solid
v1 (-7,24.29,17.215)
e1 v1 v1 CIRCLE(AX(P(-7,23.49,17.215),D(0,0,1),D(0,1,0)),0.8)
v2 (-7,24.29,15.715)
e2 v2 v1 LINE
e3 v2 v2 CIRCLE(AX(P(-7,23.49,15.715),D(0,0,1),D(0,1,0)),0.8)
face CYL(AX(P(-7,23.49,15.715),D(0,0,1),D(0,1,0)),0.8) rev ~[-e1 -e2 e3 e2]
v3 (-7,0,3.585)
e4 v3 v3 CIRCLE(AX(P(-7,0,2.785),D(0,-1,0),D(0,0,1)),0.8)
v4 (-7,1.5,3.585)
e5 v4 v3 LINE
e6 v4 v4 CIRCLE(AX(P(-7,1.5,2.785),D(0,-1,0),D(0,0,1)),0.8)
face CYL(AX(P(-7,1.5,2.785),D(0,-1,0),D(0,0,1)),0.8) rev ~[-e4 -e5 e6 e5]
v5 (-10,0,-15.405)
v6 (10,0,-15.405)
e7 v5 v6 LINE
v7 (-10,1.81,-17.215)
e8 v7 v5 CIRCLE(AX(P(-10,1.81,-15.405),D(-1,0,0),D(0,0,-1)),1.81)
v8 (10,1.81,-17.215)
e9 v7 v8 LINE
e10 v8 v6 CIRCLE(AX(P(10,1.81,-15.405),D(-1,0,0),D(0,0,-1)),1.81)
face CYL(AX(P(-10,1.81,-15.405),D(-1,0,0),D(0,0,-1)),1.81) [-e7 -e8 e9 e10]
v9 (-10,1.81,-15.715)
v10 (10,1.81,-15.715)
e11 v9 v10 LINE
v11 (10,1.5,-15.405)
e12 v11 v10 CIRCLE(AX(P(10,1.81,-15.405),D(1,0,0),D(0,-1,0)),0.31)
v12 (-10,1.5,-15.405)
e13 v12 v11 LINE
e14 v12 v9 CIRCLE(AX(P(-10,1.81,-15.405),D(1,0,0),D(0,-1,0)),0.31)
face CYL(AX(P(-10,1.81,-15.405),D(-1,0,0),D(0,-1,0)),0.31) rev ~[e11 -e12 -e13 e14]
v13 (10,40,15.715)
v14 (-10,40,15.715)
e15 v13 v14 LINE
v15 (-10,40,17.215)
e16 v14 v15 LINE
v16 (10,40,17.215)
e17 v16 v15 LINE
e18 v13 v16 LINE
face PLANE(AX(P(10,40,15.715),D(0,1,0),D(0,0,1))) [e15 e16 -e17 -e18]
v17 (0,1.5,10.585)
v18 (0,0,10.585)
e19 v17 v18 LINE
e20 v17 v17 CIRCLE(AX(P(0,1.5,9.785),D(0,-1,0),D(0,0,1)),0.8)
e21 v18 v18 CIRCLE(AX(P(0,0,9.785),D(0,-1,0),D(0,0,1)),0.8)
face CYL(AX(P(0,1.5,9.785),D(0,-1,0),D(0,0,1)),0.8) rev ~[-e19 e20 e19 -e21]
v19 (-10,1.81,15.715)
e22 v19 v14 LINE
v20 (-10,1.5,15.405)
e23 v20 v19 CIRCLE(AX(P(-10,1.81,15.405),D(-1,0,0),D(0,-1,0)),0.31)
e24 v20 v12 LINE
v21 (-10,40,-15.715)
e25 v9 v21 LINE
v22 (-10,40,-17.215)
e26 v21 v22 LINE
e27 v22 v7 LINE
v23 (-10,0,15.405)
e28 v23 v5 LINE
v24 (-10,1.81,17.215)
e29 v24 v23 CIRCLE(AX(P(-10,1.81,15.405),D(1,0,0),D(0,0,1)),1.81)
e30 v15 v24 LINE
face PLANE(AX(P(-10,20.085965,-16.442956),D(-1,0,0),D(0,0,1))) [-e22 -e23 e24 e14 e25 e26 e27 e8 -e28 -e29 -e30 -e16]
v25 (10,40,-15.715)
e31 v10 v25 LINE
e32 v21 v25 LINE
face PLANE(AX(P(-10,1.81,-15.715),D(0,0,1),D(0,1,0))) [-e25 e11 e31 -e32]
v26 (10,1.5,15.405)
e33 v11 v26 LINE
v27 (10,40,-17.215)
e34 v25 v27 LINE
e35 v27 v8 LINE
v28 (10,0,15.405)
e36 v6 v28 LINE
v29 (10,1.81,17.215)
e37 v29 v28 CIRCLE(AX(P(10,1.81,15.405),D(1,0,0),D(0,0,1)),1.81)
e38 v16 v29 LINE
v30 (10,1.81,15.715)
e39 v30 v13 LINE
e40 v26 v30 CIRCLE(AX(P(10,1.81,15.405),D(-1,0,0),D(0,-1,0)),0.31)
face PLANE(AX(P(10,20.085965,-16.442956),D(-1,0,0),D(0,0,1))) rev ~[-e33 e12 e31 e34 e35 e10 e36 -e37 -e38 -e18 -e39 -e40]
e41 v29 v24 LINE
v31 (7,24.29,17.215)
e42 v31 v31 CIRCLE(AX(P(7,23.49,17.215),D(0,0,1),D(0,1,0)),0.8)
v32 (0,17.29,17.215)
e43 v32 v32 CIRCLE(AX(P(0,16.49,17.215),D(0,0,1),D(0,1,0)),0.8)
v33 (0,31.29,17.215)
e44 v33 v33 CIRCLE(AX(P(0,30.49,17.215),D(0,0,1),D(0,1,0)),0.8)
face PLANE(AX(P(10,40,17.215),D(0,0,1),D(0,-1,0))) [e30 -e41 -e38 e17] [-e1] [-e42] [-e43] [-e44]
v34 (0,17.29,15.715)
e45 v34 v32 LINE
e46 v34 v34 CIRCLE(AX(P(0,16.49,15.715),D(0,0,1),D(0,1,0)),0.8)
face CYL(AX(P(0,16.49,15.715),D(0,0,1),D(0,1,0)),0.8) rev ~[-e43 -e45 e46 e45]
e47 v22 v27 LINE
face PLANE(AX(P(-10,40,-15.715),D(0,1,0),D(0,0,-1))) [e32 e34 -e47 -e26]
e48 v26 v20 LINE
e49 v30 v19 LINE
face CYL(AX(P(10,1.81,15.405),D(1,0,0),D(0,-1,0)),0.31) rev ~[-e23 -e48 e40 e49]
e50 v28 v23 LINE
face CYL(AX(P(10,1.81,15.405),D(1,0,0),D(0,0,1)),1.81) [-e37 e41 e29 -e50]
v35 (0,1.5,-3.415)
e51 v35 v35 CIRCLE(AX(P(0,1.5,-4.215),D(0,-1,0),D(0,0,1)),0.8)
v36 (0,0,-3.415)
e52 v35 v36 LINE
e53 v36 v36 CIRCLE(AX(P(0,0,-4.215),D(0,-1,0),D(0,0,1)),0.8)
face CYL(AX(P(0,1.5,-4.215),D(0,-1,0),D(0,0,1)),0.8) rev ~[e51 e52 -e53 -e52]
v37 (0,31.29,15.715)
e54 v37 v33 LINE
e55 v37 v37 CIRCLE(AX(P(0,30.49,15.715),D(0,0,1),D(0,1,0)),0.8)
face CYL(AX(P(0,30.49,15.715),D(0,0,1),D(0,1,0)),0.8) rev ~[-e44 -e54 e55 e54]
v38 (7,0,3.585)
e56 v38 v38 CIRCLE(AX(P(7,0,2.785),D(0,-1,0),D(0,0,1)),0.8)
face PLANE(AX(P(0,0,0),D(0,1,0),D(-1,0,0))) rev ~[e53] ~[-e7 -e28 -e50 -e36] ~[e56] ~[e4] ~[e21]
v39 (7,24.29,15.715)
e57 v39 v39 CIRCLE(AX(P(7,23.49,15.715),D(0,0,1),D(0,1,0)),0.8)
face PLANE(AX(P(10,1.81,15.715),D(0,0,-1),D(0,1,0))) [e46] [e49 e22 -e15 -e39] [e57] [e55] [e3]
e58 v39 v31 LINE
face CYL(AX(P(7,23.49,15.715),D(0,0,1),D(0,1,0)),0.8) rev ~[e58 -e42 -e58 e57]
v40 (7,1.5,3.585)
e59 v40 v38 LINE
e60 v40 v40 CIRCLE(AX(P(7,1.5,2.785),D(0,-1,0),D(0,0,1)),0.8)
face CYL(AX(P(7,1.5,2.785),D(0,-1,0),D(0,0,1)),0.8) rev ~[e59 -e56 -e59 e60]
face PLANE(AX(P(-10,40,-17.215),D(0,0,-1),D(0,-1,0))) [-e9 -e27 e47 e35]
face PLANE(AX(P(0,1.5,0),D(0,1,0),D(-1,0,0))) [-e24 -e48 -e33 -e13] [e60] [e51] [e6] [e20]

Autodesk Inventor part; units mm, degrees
ref_plane "YZ Plane" through (0, 0, 0) normal (1, 0, 0) x (0, 1, 0)
ref_plane "XZ Plane" through (0, 0, 0) normal (0, 1, 0) x (-1, 0, 0)
ref_plane "XY Plane" through (0, 0, 0) normal (0, 0, 1) x (1, 0, 0)
sketch "Sketch1" plane through (0, 0, 0) normal (0, 1, 0) x (-1, 0, 0)
  line L0 (10, -15.715) -> (-10, -15.715)
  line L1 (-10, -15.715) -> (-10, 15.715)
  line L2 (-10, 15.715) -> (10, 15.715)
  line L3 (10, 15.715) -> (10, -15.715)
  point P0 (0, 0)
  dimension "d0" = 20
  dimension "d1" = 31.43
  dimension "d2" = 10
  dimension "d3" = 15.715
extrude "Plate1" add sketch "Sketch1" along normal blind 1.5
sketch "Sketch2" plane through (10, 0, 17.215) normal (0, 0, -1) x (-1, 0, 0)
  line L0 (20, 0) -> (0, 0)
  line L1 (0, 0) -> (0, 40)
  line L2 (0, 40) -> (20, 40)
  line L3 (20, 40) -> (20, 0)
edge flange "Flange1" height 40 angle 90 thickness 1.5 bend radius 0.31 thickness toward (0, 0, -1) relief tear relief width 1.5 relief depth 0.75 edges at (0, 1.5, 15.715) wall of the first edge with corners at (-10, 0, 17.215) (10, 0, 17.215) (10, 40, 17.215) (-10, 40, 17.215)
bend "Bend1"
corner "Corner1"
sketch "Sketch3" plane through (-10, 0, -17.215) normal (0, 0, 1) x (1, 0, 0)
  line L0 (20, 0) -> (0, 0)
  line L1 (0, 0) -> (0, 40)
  line L2 (0, 40) -> (20, 40)
  line L3 (20, 40) -> (20, 0)
edge flange "Flange2" height 40 angle 90 thickness 1.5 bend radius 0.31 thickness toward (0, 0, 1) relief tear relief width 1.5 relief depth 0.75 edges at (0, 1.5, -15.715) wall of the first edge with corners at (10, 0, -17.215) (-10, 0, -17.215) (-10, 40, -17.215) (10, 40, -17.215)
bend "Bend2"
corner "Corner2"
sketch "Sketch4" plane through (10, 40, 15.715) normal (0, 0, -1) x (-1, 0, 0)
  line L0 (30.46, -23.2265) -> (30.46, -24.7935) projected
  line L1 (38.57, -15.71) -> (38.57, -17.31) projected
  circle A0 centre (3, -16.51) radius 0.7835 projected
  circle A1 centre (10, -9.51) radius 0.7835 projected
  line L2 (38.57, -15.71) -> (38.57, -17.31) projected
  line L3 (38.57, -15.71) -> (38.57, -17.31) projected
  line L4 (37.07, -17.31) -> (37.07, -15.71) projected
  line L5 (30.46, -23.2265) -> (30.46, -24.7935) projected
  circle A2 centre (10, -23.51) radius 0.7835 projected
  circle A3 centre (3, -16.51) radius 0.7835 projected
  circle A4 centre (17, -16.51) radius 0.7835 projected
  circle A5 centre (10, -9.51) radius 0.7835 projected
  point P0 (10, -40)
hole "Hole1" at (0, 16.49, 15.715) at (-7, 23.49, 15.715) at (0, 30.49, 15.715) at (7, 23.49, 15.715) direction (0, 0, 1) diameter 1.6 depth 1.5
sketch "Sketch5" plane through (0, 1.5, 0) normal (0, 1, 0) x (1, 0, 0)
  circle A0 centre (-7, -2.785) radius 0.7835 projected
  circle A1 centre (0, -9.785) radius 0.7835 projected
  circle A2 centre (7, -2.785) radius 0.7835 projected
  circle A3 centre (0, 4.215) radius 0.7835 projected
  point P0 (0, 0)
hole "Hole2" at (-7, 1.5, 2.785) at (0, 1.5, 9.785) at (7, 1.5, 2.785) at (0, 1.5, -4.215) direction (0, -1, 0) diameter 1.6 depth 1.5
equation "\"d30\" = Thickness"
equation "\"d37\" = Thickness"
equation "\"d4\" = Thickness"
equation "\"d5\" = BendReliefWidth"
equation "\"d6\" = BendReliefDepth"
equation "\"d7\" = MinimumRemnant"
equation "\"d8\" = TransitionRadius"
equation "\"d11\" = BendRadius"
equation "\"d12\" = CornerReliefSize"
equation "\"d13\" = GapSize"
equation "\"d14\" = JacobiRadiusSize"
equation "\"d15\" = BendReliefWidth"
equation "\"d16\" = BendReliefDepth"
equation "\"d17\" = MinimumRemnant"
equation "\"d18\" = TransitionRadius"
equation "\"d21\" = BendRadius"
equation "\"d22\" = CornerReliefSize"
equation "\"d23\" = GapSize"
equation "\"d24\" = JacobiRadiusSize"
equation "\"BendReliefWidth\" = Thickness"
equation "\"BendReliefDepth\" = 0.5 * Thickness"
equation "\"CornerReliefSize\" = 4 * Thickness"
equation "\"MinimumRemnant\" = 2 * Thickness"
equation "\"TransitionRadius\" = BendRadius"
equation "\"JacobiRadiusSize\" = BendRadius"
equation "\"GapSize\" = Thickness"
equation "\"Thickness\" = 1.5"
equation "\"BendRadius\" = 0.31"
properties part number "axis_7_top_frame" material "Aluminum 6061-AHC"
